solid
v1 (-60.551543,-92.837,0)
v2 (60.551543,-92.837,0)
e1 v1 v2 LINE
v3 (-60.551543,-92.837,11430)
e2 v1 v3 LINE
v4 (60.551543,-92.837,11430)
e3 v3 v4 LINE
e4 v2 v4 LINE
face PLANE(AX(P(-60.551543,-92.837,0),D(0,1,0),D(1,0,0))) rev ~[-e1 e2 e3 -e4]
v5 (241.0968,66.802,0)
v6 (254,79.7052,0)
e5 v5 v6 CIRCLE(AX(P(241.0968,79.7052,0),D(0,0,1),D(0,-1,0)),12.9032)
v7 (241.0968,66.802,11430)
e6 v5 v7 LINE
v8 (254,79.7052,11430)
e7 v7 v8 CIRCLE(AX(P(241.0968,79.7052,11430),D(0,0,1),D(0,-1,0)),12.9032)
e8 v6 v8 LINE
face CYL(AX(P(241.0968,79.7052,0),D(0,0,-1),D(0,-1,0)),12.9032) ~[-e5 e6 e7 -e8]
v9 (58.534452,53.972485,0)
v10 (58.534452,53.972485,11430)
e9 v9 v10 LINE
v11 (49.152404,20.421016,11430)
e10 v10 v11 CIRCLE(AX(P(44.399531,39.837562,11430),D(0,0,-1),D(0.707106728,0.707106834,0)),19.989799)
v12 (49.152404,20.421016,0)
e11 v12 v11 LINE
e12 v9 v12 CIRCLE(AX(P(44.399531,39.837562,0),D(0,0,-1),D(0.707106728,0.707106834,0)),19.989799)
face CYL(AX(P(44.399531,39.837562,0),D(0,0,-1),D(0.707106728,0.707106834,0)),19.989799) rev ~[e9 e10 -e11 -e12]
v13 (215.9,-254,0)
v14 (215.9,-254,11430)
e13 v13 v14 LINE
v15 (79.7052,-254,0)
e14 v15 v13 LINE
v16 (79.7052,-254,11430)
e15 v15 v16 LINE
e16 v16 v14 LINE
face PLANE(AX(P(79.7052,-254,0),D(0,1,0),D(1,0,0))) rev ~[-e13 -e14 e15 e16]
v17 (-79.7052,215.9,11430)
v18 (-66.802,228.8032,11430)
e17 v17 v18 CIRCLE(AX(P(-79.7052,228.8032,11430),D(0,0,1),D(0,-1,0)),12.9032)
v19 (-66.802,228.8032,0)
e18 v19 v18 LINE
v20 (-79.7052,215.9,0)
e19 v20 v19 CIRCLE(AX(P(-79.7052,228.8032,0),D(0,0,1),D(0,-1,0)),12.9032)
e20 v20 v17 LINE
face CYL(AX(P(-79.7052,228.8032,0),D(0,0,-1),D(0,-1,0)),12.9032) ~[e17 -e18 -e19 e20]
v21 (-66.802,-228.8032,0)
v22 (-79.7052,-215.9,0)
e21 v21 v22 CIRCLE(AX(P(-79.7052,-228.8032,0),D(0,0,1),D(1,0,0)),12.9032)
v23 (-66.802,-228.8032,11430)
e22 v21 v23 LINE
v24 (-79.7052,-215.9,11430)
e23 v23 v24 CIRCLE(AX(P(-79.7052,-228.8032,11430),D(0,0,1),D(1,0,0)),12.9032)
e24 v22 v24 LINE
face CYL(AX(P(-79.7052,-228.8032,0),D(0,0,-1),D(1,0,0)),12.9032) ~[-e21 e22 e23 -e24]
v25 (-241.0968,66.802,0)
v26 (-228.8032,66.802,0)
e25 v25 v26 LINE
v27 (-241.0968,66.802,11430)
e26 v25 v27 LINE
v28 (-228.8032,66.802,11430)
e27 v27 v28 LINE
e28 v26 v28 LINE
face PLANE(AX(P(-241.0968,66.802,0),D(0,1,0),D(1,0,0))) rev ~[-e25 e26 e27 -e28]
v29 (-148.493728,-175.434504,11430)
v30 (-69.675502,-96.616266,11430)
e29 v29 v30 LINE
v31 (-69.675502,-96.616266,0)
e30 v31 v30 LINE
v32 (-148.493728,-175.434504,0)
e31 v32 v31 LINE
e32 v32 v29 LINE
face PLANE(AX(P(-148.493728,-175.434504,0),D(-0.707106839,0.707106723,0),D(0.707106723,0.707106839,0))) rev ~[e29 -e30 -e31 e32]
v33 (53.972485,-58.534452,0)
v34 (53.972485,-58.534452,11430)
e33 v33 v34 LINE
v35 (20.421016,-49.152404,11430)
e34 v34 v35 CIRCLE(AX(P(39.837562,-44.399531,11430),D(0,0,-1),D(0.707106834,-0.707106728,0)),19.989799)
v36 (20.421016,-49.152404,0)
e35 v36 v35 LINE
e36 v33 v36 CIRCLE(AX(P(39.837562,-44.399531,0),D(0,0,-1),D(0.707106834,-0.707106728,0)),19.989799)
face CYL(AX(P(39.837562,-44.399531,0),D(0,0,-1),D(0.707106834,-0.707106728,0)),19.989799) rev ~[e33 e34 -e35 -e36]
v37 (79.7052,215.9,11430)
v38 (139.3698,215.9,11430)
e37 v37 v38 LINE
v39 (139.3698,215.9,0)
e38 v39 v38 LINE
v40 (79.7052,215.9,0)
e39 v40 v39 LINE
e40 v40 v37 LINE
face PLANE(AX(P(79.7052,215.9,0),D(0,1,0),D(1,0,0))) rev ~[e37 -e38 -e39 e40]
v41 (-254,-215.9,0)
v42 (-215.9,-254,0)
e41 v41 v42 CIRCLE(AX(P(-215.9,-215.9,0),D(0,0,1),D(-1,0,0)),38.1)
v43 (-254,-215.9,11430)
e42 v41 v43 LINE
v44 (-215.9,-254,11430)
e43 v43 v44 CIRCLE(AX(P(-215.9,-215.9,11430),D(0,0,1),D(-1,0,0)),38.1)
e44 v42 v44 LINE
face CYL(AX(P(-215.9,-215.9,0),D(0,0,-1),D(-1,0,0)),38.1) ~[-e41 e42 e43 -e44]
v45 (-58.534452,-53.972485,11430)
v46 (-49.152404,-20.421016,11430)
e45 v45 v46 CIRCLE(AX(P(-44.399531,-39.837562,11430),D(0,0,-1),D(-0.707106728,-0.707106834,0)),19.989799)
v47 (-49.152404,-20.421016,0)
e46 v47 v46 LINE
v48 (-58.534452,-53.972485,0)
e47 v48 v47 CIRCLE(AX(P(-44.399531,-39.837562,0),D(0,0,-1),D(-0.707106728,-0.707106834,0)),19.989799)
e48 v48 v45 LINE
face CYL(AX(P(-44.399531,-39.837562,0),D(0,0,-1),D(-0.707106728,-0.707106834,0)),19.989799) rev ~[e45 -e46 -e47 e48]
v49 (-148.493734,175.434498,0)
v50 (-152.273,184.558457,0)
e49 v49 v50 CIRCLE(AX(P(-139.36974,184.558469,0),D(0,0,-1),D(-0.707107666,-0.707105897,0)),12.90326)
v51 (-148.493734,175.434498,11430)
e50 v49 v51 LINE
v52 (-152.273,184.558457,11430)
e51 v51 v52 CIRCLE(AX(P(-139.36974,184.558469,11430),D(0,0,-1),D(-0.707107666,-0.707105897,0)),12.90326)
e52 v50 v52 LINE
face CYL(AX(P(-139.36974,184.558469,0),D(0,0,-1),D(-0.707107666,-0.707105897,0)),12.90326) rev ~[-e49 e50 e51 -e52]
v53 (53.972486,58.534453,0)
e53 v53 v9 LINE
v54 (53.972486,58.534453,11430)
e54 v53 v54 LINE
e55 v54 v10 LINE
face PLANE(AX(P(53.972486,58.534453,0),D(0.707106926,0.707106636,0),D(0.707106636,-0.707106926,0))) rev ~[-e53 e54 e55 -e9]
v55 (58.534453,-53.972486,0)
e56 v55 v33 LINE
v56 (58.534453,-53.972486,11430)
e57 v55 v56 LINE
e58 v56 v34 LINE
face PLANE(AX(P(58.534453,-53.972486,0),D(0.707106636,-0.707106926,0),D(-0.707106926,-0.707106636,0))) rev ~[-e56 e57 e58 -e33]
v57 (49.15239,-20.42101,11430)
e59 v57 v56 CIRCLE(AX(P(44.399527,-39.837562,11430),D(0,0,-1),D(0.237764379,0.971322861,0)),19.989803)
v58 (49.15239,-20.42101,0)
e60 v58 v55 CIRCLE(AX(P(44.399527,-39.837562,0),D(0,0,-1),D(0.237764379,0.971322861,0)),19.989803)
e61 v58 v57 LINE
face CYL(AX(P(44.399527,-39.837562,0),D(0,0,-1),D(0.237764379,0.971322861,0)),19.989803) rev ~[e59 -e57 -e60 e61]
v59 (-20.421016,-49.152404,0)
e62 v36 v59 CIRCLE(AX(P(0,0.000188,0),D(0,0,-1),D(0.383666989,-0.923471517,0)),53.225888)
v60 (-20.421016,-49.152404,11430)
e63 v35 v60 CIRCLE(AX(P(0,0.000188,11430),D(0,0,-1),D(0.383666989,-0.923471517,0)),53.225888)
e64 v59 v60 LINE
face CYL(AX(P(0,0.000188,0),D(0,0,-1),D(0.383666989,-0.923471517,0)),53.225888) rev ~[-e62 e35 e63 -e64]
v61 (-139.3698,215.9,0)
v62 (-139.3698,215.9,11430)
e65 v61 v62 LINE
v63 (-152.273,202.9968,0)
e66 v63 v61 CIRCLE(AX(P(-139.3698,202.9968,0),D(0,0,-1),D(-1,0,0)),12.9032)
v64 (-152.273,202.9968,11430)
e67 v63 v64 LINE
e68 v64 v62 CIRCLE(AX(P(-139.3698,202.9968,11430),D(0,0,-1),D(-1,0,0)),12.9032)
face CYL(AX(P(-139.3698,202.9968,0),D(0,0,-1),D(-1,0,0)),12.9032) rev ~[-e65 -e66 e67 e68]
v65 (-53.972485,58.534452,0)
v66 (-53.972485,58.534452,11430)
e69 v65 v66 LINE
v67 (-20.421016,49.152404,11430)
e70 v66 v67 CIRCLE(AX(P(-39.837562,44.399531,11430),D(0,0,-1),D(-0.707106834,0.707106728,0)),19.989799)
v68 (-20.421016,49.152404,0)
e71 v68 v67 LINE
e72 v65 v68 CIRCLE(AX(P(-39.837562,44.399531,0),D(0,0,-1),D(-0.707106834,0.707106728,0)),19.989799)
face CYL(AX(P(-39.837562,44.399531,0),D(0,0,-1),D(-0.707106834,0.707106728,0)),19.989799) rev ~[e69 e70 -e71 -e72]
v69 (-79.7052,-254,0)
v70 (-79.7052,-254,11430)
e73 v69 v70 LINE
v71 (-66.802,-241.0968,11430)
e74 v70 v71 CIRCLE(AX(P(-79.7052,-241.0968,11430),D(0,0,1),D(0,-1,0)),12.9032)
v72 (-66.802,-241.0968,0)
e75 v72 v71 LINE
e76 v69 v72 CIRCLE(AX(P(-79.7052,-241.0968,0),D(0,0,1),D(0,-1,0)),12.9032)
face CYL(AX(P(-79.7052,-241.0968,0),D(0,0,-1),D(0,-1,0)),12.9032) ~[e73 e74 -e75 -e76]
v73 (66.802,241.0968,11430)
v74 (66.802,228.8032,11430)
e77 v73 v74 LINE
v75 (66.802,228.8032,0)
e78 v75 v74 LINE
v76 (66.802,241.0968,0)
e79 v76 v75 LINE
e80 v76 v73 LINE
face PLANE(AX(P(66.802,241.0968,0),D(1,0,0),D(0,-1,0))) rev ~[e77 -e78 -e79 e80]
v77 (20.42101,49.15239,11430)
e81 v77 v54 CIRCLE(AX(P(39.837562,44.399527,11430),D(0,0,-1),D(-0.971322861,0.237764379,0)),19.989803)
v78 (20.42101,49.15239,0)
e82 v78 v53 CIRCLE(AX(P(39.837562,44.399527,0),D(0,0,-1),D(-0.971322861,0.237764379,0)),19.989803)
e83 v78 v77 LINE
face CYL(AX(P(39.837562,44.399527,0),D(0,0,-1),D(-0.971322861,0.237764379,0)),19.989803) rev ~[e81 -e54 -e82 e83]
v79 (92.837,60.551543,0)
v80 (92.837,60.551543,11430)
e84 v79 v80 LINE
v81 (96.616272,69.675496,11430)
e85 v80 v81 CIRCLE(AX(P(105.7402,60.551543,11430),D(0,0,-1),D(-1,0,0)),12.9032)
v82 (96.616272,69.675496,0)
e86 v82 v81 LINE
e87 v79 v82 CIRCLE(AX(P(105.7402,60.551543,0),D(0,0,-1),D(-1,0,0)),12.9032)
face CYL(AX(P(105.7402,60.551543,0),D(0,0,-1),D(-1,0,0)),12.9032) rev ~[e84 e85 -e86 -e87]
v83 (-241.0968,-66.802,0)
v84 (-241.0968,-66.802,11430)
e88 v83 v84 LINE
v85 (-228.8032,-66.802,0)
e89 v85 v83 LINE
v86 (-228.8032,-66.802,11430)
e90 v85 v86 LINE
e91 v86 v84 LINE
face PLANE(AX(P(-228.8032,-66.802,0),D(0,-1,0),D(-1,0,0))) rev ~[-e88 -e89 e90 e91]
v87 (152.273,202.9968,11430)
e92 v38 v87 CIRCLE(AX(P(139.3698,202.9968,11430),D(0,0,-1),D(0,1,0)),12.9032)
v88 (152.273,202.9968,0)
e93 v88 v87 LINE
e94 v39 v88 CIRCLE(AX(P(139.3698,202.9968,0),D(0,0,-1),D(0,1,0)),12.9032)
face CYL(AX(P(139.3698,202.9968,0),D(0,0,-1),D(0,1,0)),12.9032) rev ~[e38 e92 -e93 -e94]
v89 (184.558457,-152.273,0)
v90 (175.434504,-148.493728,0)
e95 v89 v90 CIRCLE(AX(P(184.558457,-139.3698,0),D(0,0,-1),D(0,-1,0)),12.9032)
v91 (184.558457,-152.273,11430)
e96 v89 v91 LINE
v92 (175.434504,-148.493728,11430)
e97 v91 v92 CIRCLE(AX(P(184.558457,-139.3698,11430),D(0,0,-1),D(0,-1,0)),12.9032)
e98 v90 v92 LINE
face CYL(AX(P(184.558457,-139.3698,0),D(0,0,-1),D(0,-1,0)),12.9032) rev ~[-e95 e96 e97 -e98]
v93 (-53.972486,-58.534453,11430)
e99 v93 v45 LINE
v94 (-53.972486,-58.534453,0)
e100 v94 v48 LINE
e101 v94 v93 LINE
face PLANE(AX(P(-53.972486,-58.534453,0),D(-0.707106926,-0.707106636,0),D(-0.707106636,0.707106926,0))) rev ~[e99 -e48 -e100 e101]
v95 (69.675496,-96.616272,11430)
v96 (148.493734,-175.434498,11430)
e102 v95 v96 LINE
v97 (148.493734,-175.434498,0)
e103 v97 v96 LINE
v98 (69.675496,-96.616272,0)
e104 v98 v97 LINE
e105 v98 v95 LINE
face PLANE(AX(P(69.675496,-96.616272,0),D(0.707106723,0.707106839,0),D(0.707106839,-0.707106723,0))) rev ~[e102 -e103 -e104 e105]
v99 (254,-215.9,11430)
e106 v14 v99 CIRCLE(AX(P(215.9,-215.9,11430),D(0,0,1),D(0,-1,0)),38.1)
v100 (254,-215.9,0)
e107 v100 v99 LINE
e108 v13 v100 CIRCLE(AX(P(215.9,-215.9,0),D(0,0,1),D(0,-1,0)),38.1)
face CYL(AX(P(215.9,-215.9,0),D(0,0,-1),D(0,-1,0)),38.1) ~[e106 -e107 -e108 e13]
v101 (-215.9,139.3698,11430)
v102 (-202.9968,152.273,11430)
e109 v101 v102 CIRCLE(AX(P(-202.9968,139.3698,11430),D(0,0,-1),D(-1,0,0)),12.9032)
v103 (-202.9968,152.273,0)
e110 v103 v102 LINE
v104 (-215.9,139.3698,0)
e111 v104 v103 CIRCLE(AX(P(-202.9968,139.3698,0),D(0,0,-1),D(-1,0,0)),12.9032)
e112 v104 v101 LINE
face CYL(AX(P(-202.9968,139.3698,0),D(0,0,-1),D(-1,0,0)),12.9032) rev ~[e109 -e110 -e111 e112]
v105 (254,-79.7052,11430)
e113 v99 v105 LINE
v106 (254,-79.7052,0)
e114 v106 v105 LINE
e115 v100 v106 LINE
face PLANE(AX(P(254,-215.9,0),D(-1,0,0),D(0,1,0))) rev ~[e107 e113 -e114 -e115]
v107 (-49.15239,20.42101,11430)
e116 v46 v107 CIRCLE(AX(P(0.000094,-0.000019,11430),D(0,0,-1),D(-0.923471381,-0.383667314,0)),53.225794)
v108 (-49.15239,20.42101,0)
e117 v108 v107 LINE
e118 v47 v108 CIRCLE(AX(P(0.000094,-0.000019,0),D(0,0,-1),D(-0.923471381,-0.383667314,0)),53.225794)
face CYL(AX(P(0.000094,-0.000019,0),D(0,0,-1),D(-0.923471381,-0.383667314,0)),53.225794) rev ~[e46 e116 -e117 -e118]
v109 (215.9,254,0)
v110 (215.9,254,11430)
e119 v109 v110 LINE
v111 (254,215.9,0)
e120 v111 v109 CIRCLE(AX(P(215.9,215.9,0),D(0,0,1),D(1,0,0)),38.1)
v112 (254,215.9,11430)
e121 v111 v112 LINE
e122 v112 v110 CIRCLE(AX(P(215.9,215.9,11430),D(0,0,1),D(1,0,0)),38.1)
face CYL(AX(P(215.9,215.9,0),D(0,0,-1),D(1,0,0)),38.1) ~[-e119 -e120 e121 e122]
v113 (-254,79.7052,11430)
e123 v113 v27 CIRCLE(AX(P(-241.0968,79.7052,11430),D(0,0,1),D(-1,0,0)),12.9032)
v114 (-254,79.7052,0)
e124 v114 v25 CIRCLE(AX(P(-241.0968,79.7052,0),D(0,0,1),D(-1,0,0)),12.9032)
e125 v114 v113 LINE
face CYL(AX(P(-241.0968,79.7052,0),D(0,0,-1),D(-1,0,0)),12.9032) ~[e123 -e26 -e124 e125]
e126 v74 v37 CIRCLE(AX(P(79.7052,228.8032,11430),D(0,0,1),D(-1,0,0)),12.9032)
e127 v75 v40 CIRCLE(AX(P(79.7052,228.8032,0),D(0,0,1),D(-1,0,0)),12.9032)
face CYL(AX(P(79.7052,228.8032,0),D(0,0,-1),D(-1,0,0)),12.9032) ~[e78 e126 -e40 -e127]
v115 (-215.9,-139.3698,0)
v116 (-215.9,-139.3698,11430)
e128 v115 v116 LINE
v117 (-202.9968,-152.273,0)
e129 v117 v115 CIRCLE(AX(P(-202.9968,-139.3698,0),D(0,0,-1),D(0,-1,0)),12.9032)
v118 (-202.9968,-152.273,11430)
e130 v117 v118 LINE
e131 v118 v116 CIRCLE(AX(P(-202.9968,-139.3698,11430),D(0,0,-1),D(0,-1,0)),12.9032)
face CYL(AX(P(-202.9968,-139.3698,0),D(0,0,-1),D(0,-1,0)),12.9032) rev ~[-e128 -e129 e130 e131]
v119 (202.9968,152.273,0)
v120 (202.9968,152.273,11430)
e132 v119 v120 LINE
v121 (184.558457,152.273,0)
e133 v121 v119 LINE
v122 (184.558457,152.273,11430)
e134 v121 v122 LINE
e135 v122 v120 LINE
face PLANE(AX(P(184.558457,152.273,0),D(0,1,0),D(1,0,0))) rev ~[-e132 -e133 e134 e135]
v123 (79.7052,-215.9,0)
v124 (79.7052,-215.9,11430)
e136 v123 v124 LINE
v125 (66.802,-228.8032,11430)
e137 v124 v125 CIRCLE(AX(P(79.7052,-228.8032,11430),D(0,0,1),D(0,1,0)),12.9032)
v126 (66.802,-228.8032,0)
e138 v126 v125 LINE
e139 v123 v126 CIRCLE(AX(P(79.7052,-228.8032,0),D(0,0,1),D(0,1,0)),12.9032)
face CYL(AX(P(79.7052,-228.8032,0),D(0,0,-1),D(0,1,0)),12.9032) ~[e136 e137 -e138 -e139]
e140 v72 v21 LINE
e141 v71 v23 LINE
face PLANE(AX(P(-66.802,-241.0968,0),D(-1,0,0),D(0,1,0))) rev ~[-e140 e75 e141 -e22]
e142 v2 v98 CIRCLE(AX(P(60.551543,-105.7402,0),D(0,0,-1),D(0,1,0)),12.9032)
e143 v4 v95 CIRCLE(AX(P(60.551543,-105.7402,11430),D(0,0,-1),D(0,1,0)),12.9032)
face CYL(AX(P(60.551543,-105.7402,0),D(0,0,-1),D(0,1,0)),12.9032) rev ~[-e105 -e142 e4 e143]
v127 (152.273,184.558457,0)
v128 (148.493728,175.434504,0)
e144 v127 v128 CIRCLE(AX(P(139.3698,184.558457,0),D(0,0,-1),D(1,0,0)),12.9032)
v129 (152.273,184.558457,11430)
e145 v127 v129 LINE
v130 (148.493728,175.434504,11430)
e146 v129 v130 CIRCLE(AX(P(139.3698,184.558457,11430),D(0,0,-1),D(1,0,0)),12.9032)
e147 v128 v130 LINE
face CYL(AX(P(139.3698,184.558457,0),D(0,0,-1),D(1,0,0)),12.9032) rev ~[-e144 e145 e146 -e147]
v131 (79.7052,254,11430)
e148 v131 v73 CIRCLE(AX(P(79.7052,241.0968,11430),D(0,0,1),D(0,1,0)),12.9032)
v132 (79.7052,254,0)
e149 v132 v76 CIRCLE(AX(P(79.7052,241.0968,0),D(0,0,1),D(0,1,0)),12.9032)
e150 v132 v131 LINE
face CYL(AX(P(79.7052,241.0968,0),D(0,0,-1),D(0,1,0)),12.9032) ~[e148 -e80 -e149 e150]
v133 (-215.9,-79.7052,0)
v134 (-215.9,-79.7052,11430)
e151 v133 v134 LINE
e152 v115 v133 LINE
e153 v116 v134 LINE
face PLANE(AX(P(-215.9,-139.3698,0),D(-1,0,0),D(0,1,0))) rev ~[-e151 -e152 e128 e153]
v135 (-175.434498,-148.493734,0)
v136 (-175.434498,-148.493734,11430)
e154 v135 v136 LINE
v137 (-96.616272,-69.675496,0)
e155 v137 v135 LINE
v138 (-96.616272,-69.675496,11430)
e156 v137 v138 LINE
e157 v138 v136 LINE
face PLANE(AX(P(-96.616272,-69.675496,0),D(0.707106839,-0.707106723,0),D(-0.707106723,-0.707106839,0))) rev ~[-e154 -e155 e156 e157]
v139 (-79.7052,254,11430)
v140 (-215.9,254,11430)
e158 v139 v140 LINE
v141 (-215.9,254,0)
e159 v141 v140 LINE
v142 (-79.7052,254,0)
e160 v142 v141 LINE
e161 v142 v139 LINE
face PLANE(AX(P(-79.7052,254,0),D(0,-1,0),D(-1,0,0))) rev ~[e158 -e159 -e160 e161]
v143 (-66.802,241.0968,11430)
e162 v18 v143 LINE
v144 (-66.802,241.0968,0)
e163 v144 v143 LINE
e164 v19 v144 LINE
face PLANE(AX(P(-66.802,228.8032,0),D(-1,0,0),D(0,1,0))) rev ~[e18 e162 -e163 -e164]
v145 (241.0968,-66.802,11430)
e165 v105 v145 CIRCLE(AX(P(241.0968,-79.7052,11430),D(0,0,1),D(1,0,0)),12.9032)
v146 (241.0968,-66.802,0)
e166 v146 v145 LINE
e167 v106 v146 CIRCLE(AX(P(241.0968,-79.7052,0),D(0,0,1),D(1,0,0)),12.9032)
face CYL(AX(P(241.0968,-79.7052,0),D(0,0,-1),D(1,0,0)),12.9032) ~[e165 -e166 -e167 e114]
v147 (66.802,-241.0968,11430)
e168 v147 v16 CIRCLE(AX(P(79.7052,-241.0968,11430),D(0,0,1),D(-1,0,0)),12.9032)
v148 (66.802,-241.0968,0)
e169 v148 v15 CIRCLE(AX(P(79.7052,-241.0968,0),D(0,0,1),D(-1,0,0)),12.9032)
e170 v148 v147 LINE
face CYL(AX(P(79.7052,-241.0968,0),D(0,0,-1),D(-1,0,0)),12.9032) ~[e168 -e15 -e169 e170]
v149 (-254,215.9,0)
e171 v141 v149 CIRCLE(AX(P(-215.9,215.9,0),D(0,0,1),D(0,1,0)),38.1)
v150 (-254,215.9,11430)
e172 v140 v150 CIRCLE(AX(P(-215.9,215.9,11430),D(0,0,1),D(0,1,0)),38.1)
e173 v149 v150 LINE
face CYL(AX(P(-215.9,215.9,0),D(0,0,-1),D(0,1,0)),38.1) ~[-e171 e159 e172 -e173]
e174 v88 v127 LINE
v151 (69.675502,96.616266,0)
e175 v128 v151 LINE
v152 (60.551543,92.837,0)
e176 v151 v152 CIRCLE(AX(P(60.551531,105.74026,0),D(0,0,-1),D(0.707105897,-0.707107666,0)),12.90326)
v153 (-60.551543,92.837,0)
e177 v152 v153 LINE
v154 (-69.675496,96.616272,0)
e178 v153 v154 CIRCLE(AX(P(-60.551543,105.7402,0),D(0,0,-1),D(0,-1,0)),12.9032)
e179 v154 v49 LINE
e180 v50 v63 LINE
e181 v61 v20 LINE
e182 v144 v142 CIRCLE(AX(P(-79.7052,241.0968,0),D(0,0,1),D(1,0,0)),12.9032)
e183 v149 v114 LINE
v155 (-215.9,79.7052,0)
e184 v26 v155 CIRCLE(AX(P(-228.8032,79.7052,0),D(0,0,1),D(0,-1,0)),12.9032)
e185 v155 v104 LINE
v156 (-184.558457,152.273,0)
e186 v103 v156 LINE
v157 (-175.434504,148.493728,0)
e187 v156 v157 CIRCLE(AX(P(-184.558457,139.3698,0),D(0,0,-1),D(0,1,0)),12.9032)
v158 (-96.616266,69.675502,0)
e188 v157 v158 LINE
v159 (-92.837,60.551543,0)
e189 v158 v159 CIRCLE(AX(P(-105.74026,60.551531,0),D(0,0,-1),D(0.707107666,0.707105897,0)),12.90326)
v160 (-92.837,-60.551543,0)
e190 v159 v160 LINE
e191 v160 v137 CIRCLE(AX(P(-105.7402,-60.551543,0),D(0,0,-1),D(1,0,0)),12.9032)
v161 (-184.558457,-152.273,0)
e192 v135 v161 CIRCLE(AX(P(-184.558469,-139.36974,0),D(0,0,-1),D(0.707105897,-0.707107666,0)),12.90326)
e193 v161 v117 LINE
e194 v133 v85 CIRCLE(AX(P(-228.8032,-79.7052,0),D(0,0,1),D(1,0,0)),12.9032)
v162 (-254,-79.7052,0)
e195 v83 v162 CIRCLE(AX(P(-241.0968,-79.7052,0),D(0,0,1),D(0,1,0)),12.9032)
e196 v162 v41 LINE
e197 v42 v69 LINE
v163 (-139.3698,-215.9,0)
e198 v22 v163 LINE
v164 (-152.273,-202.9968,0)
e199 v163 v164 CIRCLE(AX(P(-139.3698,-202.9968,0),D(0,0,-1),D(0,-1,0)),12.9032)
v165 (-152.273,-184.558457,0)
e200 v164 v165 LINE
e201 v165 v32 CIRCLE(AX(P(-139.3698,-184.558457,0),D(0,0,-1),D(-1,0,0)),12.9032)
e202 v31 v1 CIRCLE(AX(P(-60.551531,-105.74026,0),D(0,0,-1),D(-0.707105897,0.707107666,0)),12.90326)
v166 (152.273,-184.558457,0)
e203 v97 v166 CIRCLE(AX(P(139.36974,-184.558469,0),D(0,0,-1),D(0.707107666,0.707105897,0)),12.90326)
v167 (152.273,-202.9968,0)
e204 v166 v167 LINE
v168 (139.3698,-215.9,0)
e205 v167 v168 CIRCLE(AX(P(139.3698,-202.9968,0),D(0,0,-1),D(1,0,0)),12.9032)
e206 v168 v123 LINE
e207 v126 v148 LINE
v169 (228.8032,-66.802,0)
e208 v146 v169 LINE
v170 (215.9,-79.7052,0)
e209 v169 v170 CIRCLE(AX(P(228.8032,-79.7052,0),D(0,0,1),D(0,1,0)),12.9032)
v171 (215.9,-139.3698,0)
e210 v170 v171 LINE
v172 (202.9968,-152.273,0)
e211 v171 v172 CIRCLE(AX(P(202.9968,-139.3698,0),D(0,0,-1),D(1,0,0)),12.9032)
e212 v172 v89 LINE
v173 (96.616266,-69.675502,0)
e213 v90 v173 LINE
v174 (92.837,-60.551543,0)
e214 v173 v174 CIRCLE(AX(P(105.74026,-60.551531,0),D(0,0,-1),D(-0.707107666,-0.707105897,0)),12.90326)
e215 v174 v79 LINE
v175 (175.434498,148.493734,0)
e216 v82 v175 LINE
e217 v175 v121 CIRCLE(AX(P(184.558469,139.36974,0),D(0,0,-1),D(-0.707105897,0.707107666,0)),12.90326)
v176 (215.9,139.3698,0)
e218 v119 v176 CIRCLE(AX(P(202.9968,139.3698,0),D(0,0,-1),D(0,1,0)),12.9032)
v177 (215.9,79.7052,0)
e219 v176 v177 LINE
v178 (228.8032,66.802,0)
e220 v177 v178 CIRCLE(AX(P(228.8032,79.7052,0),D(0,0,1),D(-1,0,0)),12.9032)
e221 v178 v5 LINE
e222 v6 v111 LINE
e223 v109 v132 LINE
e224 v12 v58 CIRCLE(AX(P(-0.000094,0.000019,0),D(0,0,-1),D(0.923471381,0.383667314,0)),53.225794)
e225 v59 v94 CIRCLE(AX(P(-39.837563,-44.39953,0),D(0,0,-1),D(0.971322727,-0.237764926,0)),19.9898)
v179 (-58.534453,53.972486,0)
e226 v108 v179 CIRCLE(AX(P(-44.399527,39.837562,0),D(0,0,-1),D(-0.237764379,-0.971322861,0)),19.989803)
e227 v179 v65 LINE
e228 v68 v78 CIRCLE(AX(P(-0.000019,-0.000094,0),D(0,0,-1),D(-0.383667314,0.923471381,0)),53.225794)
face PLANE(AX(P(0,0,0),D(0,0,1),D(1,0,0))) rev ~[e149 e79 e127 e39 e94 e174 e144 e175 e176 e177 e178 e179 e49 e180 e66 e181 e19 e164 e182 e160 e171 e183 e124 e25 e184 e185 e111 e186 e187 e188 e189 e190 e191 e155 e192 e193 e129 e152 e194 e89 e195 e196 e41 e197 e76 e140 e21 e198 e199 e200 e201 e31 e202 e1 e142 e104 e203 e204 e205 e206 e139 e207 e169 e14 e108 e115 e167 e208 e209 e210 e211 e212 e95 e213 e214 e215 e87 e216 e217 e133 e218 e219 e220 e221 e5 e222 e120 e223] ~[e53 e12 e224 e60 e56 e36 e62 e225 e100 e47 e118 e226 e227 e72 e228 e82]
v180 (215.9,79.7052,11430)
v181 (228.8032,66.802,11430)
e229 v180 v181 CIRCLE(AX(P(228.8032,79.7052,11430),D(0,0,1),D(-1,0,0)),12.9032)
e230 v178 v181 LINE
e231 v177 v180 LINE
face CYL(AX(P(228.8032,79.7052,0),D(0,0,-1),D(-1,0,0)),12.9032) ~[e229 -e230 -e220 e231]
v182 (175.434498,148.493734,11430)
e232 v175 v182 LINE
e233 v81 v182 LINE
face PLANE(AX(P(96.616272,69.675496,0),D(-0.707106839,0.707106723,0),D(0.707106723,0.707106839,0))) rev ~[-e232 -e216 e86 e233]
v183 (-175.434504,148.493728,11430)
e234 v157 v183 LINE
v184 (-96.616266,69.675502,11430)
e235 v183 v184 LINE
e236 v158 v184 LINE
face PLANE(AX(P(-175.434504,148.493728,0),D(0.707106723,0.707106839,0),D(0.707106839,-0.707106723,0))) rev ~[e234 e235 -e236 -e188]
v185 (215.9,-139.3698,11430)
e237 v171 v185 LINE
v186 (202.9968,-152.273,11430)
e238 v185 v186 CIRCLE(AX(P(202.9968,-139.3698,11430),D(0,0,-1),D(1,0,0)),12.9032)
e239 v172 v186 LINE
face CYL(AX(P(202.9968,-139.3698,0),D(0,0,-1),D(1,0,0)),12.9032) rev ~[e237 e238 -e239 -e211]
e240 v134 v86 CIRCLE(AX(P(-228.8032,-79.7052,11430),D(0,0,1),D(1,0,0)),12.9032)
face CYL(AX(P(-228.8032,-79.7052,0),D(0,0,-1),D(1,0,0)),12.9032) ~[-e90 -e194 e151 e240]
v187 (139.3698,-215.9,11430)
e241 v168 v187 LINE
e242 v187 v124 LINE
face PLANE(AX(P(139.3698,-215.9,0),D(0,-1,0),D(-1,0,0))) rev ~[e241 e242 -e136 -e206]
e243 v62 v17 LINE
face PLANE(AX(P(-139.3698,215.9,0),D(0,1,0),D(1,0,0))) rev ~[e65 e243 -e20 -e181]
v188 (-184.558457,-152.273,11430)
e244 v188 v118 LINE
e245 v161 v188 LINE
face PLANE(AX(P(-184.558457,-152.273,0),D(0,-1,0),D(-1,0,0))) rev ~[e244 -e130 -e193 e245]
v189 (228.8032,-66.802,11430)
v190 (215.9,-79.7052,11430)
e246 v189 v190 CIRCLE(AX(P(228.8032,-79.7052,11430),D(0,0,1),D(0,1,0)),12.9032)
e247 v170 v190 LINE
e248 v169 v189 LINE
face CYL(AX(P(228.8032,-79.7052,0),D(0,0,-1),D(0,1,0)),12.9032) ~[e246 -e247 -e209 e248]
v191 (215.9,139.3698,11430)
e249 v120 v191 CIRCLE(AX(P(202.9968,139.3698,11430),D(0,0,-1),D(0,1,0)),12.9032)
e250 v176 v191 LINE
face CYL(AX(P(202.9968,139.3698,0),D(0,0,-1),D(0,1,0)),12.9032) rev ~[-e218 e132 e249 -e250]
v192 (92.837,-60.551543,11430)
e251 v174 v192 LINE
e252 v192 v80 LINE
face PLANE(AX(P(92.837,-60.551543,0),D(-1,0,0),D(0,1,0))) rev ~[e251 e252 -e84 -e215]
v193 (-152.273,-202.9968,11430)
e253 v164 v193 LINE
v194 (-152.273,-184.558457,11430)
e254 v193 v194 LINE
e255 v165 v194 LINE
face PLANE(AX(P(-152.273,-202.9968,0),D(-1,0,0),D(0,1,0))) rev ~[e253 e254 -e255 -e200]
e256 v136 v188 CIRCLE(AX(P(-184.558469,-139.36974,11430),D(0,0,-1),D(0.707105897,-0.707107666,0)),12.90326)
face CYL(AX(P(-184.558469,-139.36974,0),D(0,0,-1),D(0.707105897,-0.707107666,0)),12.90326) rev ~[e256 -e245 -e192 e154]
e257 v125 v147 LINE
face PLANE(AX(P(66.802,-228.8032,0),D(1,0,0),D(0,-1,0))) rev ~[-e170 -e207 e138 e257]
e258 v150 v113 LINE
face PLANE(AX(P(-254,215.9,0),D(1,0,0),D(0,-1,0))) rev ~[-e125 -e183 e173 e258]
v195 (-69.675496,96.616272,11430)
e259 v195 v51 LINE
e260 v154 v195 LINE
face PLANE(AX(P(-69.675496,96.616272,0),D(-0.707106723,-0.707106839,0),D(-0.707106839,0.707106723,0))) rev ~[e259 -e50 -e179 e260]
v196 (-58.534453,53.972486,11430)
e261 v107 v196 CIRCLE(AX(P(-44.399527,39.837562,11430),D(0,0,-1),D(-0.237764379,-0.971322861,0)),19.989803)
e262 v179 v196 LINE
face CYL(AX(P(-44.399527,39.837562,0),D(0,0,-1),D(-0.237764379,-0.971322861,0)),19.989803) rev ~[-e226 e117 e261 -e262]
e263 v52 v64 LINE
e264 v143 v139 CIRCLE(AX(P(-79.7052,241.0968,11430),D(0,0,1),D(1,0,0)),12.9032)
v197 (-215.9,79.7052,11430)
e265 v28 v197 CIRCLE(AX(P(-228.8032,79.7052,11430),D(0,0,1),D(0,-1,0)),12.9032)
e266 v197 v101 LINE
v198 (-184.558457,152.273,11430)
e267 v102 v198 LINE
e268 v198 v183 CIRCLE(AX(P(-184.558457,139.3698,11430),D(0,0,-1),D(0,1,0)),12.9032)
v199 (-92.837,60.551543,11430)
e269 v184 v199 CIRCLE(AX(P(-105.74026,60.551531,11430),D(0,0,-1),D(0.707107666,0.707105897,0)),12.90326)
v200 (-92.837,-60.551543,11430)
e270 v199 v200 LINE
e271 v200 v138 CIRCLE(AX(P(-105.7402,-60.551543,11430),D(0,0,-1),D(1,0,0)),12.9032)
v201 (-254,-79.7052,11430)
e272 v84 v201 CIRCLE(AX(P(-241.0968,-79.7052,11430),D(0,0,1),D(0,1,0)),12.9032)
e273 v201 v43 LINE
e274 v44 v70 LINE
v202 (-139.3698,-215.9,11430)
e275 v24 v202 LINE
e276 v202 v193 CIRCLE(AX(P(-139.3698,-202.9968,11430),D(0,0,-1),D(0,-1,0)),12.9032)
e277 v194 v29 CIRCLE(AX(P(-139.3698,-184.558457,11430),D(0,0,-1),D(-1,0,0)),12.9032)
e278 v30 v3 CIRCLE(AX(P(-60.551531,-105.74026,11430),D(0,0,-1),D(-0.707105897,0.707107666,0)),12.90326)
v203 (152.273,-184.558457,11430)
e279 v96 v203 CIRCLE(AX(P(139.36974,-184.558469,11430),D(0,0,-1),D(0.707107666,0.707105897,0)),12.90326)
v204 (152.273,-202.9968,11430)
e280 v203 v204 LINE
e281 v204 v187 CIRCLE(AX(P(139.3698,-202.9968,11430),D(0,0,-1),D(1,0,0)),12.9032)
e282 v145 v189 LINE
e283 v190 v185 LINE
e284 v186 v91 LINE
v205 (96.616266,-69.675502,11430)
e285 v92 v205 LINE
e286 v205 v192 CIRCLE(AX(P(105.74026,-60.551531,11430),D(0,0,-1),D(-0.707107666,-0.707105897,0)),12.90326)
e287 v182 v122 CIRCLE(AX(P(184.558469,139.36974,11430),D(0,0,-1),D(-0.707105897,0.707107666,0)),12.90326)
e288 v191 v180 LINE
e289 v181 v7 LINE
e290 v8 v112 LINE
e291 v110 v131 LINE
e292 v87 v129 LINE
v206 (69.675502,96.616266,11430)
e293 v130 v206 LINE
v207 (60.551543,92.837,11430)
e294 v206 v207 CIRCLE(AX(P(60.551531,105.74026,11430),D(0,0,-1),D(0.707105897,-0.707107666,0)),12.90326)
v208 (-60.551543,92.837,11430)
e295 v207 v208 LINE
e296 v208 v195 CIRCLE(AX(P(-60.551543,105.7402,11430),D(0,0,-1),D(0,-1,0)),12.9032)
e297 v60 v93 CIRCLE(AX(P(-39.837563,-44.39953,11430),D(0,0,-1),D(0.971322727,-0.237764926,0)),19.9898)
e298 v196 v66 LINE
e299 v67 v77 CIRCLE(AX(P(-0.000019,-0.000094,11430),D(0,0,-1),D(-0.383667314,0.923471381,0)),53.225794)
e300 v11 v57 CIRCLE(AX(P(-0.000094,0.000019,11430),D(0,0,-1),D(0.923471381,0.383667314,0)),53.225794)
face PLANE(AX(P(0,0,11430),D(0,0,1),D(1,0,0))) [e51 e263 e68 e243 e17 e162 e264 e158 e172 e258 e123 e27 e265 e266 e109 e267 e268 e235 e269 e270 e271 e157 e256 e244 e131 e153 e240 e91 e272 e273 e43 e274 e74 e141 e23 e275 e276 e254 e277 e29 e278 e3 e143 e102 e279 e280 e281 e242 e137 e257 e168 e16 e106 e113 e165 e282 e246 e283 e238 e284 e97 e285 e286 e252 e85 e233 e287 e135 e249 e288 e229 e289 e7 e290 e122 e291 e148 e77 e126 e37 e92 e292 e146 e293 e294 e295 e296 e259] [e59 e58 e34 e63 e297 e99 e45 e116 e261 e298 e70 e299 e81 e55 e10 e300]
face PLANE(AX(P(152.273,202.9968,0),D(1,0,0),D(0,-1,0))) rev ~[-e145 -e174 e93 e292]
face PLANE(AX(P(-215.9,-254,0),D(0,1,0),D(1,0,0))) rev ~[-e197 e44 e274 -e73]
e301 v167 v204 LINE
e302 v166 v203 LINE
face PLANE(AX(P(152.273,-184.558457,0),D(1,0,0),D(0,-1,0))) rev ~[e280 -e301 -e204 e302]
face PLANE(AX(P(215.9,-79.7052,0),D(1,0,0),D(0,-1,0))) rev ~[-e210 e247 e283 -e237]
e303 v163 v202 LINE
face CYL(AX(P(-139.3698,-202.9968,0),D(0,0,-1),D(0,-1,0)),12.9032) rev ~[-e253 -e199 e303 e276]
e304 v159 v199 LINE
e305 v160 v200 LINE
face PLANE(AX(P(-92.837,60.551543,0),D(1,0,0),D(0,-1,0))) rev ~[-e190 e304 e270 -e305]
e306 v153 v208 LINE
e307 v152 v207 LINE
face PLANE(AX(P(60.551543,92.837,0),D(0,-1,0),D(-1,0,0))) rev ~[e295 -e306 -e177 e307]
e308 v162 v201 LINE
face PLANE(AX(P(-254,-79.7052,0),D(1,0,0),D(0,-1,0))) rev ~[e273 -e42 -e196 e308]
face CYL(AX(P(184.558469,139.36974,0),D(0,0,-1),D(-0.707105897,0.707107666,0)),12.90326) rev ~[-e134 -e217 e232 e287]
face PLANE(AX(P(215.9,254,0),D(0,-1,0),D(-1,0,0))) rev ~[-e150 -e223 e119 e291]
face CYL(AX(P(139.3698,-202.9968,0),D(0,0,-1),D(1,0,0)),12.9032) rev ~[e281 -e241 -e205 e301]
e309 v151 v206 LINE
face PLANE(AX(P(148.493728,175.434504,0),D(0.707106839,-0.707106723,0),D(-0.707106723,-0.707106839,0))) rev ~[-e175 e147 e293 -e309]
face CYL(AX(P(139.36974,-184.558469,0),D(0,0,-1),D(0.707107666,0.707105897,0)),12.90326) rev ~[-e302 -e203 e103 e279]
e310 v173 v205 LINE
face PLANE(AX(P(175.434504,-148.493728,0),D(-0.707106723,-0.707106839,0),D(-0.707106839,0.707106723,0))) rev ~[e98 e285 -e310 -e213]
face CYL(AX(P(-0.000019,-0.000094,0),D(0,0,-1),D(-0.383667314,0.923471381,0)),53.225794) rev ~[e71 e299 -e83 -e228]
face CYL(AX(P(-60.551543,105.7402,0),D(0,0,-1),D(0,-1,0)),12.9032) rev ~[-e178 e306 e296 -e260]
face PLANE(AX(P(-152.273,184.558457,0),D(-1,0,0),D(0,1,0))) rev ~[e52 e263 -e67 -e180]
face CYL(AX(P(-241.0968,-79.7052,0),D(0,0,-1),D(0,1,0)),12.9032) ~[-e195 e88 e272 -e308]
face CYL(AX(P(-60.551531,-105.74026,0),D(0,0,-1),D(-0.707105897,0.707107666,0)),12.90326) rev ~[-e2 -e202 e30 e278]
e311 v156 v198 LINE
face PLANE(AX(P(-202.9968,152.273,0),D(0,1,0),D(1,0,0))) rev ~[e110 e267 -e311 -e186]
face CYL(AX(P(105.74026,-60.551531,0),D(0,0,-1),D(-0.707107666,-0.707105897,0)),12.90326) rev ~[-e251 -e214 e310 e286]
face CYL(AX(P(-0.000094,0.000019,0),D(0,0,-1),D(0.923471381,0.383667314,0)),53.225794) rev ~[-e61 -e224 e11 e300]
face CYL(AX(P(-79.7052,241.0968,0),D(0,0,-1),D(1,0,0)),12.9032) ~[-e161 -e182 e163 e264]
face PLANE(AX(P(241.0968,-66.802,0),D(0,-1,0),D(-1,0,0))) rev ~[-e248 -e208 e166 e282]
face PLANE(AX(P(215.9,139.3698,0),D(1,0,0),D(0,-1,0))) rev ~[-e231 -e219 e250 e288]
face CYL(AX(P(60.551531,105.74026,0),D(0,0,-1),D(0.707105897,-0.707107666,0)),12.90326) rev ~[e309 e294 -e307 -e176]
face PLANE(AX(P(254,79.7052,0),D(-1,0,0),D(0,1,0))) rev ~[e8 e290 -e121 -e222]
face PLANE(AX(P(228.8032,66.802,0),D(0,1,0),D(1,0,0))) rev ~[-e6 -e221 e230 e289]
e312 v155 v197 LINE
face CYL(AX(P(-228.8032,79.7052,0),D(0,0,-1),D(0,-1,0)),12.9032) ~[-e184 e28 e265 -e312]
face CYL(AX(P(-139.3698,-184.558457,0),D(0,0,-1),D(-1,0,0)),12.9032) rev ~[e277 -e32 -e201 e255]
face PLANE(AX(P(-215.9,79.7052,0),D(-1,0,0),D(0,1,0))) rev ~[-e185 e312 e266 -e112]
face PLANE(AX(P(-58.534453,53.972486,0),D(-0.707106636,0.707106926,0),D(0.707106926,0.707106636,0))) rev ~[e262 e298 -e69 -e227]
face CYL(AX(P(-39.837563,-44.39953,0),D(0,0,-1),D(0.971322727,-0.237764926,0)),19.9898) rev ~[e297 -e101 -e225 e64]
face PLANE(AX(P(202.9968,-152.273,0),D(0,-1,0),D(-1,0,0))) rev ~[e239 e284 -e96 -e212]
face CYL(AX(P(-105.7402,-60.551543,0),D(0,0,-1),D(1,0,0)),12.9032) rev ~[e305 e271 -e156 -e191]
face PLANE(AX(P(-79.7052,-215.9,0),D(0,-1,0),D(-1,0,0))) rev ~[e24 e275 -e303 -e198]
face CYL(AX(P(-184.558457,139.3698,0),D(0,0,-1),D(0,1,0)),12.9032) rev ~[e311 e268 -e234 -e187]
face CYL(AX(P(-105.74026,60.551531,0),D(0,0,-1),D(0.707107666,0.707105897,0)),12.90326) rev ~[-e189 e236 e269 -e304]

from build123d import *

# Parameters (mm, degrees)
F1_DEPTH = 11430


# Not quite as in the source:
# - ends of sketch curves that miss each other by under 0.0002 mm in the source are joined


with BuildPart() as f1:
    # F0 (on Top) → F1 (new body)
    with BuildSketch(Plane.XY):
        with BuildLine():
            Line((228.8032, 66.802), (241.0968, 66.802))
            ThreePointArc((241.0968, 66.802), (250.220740219, 70.581259781), (254, 79.7052))
            Line((254, 79.7052), (254, 215.9))
            ThreePointArc((254, 215.9), (242.8407683632, 242.8407683632), (215.9, 254))
            Line((215.9, 254), (79.7052, 254))
            ThreePointArc((79.7052, 254), (70.581259781, 250.220740219), (66.802, 241.0968))
            Line((66.802, 241.0968), (66.802, 228.8032))
            ThreePointArc((66.802, 228.8032), (70.581259781, 219.679259781), (79.7052, 215.9))
            Line((79.7052, 215.9), (139.3698, 215.9))
            ThreePointArc((139.3698, 215.9), (148.493740219, 212.120740219), (152.273, 202.9968))
            Line((152.273, 202.9968), (152.273, 184.5584574))
            ThreePointArc((152.273, 184.5584574), (151.2907989473, 179.6206082388), (148.493727519, 175.434504481))
            Line((148.493727519, 175.434504481), (69.675502, 96.616266))
            ThreePointArc((69.675502, 96.616266), (65.4893917612, 93.8192010527), (60.5515426, 92.837))
            Line((60.5515426, 92.837), (-60.5515426, 92.837))
            ThreePointArc((-60.5515426, 92.837), (-65.4893917612, 93.8192010527), (-69.675495519, 96.616272481))
            Line((-69.675495519, 96.616272481), (-148.493734, 175.434498))
            ThreePointArc((-148.493734, 175.434498), (-151.2907989473, 179.6206082388), (-152.273, 184.5584574))
            Line((-152.273, 184.5584574), (-152.273, 202.9968))
            ThreePointArc((-152.273, 202.9968), (-148.493740219, 212.120740219), (-139.3698, 215.9))
            Line((-139.3698, 215.9), (-79.7052, 215.9))
            ThreePointArc((-79.7052, 215.9), (-70.581259781, 219.679259781), (-66.802, 228.8032))
            Line((-66.802, 228.8032), (-66.802, 241.0968))
            ThreePointArc((-66.802, 241.0968), (-70.581259781, 250.220740219), (-79.7052, 254))
            Line((-79.7052, 254), (-215.9, 254))
            ThreePointArc((-215.9, 254), (-242.8407683632, 242.8407683632), (-254, 215.9))
            Line((-254, 215.9), (-254, 79.7052))
            ThreePointArc((-254, 79.7052), (-250.220740219, 70.581259781), (-241.0968, 66.802))
            Line((-241.0968, 66.802), (-228.8032, 66.802))
            ThreePointArc((-228.8032, 66.802), (-219.679259781, 70.581259781), (-215.9, 79.7052))
            Line((-215.9, 79.7052), (-215.9, 139.3698))
            ThreePointArc((-215.9, 139.3698), (-212.120740219, 148.493740219), (-202.9968, 152.273))
            Line((-202.9968, 152.273), (-184.5584574, 152.273))
            ThreePointArc((-184.5584574, 152.273), (-179.6206082388, 151.2907989473), (-175.434504481, 148.493727519))
            Line((-175.434504481, 148.493727519), (-96.616266, 69.675502))
            ThreePointArc((-96.616266, 69.675502), (-93.8192010527, 65.4893917612), (-92.837, 60.5515426))
            Line((-92.837, 60.5515426), (-92.837, -60.5515426))
            ThreePointArc((-92.837, -60.5515426), (-93.8192010527, -65.4893917612), (-96.616272481, -69.675495519))
            Line((-96.616272481, -69.675495519), (-175.434498, -148.493734))
            ThreePointArc((-175.434498, -148.493734), (-179.6206082388, -151.2907989473), (-184.5584574, -152.273))
            Line((-184.5584574, -152.273), (-202.9968, -152.273))
            ThreePointArc((-202.9968, -152.273), (-212.120740219, -148.493740219), (-215.9, -139.3698))
            Line((-215.9, -139.3698), (-215.9, -79.7052))
            ThreePointArc((-215.9, -79.7052), (-219.679259781, -70.581259781), (-228.8032, -66.802))
            Line((-228.8032, -66.802), (-241.0968, -66.802))
            ThreePointArc((-241.0968, -66.802), (-250.220740219, -70.581259781), (-254, -79.7052))
            Line((-254, -79.7052), (-254, -215.9))
            ThreePointArc((-254, -215.9), (-242.8407683632, -242.8407683632), (-215.9, -254))
            Line((-215.9, -254), (-79.7052, -254))
            ThreePointArc((-79.7052, -254), (-70.581259781, -250.220740219), (-66.802, -241.0968))
            Line((-66.802, -241.0968), (-66.802, -228.8032))
            ThreePointArc((-66.802, -228.8032), (-70.581259781, -219.679259781), (-79.7052, -215.9))
            Line((-79.7052, -215.9), (-139.3698, -215.9))
            ThreePointArc((-139.3698, -215.9), (-148.493740219, -212.120740219), (-152.273, -202.9968))
            Line((-152.273, -202.9968), (-152.273, -184.5584574))
            ThreePointArc((-152.273, -184.5584574), (-151.2907989473, -179.6206082388), (-148.493727519, -175.434504481))
            Line((-148.493727519, -175.434504481), (-69.675502, -96.616266))
            ThreePointArc((-69.675502, -96.616266), (-65.4893917612, -93.8192010527), (-60.5515426, -92.837))
            Line((-60.5515426, -92.837), (60.5515426, -92.837))
            ThreePointArc((60.5515426, -92.837), (65.4893917612, -93.8192010527), (69.675495519, -96.616272481))
            Line((69.675495519, -96.616272481), (148.493734, -175.434498))
            ThreePointArc((148.493734, -175.434498), (151.2907989473, -179.6206082388), (152.273, -184.5584574))
            Line((152.273, -184.5584574), (152.273, -202.9968))
            ThreePointArc((152.273, -202.9968), (148.493740219, -212.120740219), (139.3698, -215.9))
            Line((139.3698, -215.9), (79.7052, -215.9))
            ThreePointArc((79.7052, -215.9), (70.581259781, -219.679259781), (66.802, -228.8032))
            Line((66.802, -228.8032), (66.802, -241.0968))
            ThreePointArc((66.802, -241.0968), (70.581259781, -250.220740219), (79.7052, -254))
            Line((79.7052, -254), (215.9, -254))
            ThreePointArc((215.9, -254), (242.8407683632, -242.8407683632), (254, -215.9))
            Line((254, -215.9), (254, -79.7052))
            ThreePointArc((254, -79.7052), (250.220740219, -70.581259781), (241.0968, -66.802))
            Line((241.0968, -66.802), (228.8032, -66.802))
            ThreePointArc((228.8032, -66.802), (219.679259781, -70.581259781), (215.9, -79.7052))
            Line((215.9, -79.7052), (215.9, -139.3698))
            ThreePointArc((215.9, -139.3698), (212.120740219, -148.493740219), (202.9968, -152.273))
            Line((202.9968, -152.273), (184.5584574, -152.273))
            ThreePointArc((184.5584574, -152.273), (179.6206082388, -151.2907989473), (175.434504481, -148.493727519))
            Line((175.434504481, -148.493727519), (96.616266, -69.675502))
            ThreePointArc((96.616266, -69.675502), (93.8192010527, -65.4893917612), (92.837, -60.5515426))
            Line((92.837, -60.5515426), (92.837, 60.5515426))
            ThreePointArc((92.837, 60.5515426), (93.8192010527, 65.4893917612), (96.616272481, 69.675495519))
            Line((96.616272481, 69.675495519), (175.434498, 148.493734))
            ThreePointArc((175.434498, 148.493734), (179.6206082388, 151.2907989473), (184.5584574, 152.273))
            Line((184.5584574, 152.273), (202.9968, 152.273))
            ThreePointArc((202.9968, 152.273), (212.120740219, 148.493740219), (215.9, 139.3698))
            Line((215.9, 139.3698), (215.9, 79.7052))
            ThreePointArc((215.9, 79.7052), (219.679259781, 70.581259781), (228.8032, 66.802))
        make_face()
        with BuildLine():
            ThreePointArc((-20.4210161511, -49.152403514), (-34.4542925862, -63.6508288974), (-53.9724863346, -58.5344533346))
            Line((-53.9724863346, -58.5344533346), (-58.5344524, -53.9724854))
            ThreePointArc((-58.5344524, -53.9724854), (-63.6508288974, -34.4542925862), (-49.152403514, -20.4210161511))
            ThreePointArc((-49.152403514, -20.4210161511), (-53.2257, 0), (-49.1523903665, 20.421010302))
            ThreePointArc((-49.1523903665, 20.421010302), (-63.6508288974, 34.4542925862), (-58.5344533346, 53.9724863346))
            Line((-58.5344533346, 53.9724863346), (-53.9724854, 58.5344524))
            ThreePointArc((-53.9724854, 58.5344524), (-34.4542925862, 63.6508288974), (-20.4210161511, 49.152403514))
            ThreePointArc((-20.4210161511, 49.152403514), (0, 53.2257), (20.421010302, 49.1523903665))
            ThreePointArc((20.421010302, 49.1523903665), (34.4542925862, 63.6508288974), (53.9724863346, 58.5344533346))
            Line((53.9724863346, 58.5344533346), (58.5344524, 53.9724854))
            ThreePointArc((58.5344524, 53.9724854), (63.6508288974, 34.4542925862), (49.152403514, 20.4210161511))
            ThreePointArc((49.152403514, 20.4210161511), (53.2257, 0), (49.1523903665, -20.421010302))
            ThreePointArc((49.1523903665, -20.421010302), (63.6508288974, -34.4542925862), (58.5344533346, -53.9724863346))
            Line((58.5344533346, -53.9724863346), (53.9724854, -58.5344524))
            ThreePointArc((53.9724854, -58.5344524), (34.4542925862, -63.6508288974), (20.4210161511, -49.152403514))
            ThreePointArc((20.4210161511, -49.152403514), (0, -53.2257), (-20.4210161511, -49.152403514))
        make_face(mode=Mode.SUBTRACT)
    extrude(amount=F1_DEPTH)


solid = f1.part
